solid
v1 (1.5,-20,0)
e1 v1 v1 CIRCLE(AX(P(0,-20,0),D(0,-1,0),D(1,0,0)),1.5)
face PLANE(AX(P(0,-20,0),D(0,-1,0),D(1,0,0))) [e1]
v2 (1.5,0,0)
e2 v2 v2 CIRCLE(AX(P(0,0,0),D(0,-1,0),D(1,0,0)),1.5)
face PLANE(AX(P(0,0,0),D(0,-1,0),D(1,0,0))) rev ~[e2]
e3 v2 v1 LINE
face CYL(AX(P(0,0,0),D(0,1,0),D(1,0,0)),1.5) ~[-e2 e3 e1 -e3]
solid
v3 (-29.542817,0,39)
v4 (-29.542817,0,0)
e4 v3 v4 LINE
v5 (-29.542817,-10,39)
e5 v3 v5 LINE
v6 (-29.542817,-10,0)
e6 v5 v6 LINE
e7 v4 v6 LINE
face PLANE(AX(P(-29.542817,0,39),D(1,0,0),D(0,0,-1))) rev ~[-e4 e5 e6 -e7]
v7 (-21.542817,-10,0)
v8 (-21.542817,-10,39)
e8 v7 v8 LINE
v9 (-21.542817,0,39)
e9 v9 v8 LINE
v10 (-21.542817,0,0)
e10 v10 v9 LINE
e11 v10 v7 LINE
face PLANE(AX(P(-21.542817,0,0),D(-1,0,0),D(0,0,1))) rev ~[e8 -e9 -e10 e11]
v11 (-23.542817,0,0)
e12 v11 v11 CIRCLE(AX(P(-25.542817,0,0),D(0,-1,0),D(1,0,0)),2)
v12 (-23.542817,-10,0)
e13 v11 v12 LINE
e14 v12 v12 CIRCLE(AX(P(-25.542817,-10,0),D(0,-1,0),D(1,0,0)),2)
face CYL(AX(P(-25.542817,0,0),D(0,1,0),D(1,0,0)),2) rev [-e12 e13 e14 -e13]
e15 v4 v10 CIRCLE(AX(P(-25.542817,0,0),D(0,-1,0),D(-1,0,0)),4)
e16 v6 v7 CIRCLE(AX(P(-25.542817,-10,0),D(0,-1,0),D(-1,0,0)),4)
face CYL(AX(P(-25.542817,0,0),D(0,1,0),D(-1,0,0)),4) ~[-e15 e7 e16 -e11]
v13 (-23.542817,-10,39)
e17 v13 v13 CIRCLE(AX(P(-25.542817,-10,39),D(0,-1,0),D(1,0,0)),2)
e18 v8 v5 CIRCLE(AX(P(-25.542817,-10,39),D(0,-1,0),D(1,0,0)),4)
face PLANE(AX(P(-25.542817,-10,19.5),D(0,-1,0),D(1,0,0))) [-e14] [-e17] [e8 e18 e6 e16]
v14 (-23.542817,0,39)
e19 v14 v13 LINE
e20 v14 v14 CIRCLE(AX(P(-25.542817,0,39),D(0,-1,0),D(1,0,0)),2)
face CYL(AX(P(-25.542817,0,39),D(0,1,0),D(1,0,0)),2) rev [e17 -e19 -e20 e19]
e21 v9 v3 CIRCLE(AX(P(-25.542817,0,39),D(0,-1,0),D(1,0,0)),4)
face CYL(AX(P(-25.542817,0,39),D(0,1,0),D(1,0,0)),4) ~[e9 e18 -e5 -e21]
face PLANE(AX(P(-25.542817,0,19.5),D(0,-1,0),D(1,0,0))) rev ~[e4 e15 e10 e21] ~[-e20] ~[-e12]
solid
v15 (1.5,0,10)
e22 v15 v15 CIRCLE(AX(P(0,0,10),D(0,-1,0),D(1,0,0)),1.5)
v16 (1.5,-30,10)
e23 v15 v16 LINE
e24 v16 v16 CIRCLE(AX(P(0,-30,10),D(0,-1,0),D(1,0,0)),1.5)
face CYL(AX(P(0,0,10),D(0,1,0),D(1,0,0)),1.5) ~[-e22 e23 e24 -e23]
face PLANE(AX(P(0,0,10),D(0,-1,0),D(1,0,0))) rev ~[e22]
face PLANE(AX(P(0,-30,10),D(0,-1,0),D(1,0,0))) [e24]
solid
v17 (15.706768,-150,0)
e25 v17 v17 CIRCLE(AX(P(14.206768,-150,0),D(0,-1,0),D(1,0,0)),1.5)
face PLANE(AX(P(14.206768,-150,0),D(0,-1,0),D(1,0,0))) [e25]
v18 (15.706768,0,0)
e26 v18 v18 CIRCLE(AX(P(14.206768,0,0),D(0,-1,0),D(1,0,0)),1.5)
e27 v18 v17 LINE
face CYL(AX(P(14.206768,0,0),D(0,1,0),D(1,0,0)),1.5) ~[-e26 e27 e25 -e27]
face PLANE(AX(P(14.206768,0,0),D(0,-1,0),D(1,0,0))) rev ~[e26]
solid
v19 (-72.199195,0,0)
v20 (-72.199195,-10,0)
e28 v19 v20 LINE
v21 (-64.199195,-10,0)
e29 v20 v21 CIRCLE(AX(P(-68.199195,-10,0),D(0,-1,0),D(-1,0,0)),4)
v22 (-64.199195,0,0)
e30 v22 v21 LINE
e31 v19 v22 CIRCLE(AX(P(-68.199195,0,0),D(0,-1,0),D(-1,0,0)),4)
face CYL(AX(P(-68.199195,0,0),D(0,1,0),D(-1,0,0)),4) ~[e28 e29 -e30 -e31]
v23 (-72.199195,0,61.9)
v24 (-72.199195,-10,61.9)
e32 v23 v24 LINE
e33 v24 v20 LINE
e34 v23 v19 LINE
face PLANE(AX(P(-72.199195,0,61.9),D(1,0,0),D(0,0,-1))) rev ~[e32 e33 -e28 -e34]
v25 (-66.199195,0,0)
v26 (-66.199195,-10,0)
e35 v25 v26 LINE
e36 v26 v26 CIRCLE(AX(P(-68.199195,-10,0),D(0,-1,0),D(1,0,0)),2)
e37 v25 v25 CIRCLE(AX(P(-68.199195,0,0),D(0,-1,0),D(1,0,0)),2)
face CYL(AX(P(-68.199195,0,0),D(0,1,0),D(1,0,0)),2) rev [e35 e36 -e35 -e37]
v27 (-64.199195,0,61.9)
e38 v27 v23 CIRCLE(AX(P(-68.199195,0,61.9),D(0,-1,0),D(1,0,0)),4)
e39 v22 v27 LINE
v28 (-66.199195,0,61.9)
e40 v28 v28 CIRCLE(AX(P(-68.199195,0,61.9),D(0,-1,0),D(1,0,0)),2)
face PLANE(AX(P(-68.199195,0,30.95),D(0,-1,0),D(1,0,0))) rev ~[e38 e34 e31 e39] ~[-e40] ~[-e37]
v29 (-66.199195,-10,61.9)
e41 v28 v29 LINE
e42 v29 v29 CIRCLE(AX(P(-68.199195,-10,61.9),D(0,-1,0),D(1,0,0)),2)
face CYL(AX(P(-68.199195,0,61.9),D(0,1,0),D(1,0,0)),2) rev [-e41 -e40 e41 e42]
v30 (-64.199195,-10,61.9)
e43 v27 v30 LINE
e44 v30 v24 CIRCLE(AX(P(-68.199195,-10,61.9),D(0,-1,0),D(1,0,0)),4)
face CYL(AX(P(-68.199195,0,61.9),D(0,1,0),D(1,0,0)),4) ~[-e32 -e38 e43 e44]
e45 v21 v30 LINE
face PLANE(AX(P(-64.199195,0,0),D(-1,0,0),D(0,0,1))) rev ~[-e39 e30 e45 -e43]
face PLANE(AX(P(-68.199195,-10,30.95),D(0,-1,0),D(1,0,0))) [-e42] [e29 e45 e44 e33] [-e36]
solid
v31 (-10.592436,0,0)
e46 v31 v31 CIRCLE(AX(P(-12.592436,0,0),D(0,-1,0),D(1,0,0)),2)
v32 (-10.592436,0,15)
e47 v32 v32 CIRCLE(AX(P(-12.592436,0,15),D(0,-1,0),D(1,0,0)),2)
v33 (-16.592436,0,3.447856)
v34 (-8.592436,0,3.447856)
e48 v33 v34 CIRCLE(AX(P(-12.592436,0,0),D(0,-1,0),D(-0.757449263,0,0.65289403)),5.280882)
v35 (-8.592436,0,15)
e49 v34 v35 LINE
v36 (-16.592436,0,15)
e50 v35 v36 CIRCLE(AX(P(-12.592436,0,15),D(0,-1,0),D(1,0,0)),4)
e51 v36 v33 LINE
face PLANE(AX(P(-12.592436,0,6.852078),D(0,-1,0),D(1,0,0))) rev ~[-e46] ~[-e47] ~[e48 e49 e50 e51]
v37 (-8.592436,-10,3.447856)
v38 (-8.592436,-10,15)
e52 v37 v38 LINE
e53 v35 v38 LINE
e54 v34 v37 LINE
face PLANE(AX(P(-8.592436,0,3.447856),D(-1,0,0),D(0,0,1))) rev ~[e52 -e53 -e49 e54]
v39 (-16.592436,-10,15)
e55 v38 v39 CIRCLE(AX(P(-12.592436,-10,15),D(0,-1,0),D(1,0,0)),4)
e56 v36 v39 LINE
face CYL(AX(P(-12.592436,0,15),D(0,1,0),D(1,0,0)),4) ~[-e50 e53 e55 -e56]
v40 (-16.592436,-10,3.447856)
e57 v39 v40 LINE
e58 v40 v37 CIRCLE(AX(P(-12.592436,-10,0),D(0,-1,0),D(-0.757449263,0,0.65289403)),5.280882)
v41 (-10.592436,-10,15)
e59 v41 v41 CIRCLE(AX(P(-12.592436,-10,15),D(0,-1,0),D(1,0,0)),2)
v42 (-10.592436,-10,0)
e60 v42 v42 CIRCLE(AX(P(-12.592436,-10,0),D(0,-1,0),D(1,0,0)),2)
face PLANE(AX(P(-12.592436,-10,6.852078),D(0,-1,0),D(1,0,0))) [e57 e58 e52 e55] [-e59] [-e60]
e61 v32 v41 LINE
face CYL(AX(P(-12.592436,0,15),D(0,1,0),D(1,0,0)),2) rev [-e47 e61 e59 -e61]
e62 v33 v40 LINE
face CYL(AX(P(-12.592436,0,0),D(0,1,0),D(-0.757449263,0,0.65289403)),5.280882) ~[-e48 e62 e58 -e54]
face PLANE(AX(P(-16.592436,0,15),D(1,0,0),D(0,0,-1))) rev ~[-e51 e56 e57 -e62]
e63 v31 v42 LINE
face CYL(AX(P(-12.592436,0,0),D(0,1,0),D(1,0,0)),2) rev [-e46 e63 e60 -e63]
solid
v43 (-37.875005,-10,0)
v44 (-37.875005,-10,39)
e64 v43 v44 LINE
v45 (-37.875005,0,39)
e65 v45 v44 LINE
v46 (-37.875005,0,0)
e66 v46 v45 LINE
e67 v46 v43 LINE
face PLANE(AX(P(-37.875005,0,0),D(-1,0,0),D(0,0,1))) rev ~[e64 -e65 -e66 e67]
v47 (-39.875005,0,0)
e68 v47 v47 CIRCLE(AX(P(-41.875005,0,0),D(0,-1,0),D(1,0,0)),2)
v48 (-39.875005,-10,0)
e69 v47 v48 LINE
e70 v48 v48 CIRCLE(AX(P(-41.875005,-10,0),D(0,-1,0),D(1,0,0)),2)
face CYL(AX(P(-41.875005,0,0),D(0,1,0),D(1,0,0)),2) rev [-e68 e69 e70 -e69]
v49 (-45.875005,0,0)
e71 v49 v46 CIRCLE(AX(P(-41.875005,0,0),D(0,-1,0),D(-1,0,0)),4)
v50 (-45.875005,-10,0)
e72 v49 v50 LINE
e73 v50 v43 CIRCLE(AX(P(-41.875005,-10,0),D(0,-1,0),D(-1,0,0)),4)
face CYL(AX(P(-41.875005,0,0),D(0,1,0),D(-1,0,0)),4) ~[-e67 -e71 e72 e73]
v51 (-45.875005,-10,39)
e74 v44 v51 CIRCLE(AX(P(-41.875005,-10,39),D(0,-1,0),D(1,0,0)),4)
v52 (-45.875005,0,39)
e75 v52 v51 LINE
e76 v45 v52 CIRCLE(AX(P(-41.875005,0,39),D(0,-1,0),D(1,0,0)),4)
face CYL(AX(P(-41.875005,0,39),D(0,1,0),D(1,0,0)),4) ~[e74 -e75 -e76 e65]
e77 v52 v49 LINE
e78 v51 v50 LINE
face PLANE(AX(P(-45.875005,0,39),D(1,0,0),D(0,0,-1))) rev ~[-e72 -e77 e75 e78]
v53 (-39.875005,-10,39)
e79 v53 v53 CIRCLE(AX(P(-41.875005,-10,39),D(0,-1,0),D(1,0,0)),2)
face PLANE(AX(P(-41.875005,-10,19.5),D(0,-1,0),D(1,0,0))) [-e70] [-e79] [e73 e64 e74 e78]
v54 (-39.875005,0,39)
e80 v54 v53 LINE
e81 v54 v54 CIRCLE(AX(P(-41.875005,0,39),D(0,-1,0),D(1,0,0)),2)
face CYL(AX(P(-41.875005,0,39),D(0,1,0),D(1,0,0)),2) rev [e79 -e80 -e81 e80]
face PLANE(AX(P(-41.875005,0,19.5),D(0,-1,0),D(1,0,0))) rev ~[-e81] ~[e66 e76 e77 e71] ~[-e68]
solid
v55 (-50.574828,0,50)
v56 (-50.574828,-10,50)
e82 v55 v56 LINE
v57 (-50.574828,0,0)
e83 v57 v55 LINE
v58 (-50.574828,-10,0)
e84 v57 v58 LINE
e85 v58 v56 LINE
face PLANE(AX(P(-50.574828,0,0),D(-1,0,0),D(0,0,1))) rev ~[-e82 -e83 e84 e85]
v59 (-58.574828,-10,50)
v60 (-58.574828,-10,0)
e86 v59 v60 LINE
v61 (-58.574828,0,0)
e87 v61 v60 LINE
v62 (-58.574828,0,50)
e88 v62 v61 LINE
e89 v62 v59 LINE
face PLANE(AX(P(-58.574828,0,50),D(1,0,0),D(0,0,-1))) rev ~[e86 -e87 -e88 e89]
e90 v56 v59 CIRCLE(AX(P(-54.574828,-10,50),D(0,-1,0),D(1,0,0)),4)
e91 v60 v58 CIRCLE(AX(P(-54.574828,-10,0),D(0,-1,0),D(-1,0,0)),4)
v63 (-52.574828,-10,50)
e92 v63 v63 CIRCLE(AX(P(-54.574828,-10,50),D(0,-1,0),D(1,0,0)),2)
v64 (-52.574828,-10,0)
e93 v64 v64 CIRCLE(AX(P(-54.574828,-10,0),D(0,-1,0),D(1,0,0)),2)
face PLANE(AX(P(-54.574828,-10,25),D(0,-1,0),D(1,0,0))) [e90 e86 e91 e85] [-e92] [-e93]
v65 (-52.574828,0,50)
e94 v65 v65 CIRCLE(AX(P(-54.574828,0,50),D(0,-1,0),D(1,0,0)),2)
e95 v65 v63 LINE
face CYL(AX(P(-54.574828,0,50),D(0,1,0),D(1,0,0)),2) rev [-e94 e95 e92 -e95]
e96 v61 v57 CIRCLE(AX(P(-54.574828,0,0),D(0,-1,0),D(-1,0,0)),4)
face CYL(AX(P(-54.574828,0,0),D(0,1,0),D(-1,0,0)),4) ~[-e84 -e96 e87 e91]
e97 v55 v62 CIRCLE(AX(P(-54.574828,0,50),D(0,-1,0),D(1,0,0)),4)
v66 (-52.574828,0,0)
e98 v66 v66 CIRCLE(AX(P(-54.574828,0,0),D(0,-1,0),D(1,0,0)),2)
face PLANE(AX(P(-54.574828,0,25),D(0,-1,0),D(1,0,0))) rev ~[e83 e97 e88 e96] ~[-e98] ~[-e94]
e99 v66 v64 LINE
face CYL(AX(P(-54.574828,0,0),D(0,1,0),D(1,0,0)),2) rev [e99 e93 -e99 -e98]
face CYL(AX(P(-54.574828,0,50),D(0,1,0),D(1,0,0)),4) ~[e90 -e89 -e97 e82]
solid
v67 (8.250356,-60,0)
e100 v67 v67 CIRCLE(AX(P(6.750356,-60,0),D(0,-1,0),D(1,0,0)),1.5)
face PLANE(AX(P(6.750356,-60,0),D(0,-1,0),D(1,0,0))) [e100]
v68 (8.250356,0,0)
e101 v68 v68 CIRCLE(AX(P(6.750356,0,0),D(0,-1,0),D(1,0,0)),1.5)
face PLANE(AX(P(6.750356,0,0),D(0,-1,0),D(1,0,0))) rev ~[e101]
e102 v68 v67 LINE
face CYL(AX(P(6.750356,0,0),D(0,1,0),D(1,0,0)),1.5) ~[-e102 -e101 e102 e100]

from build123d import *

# Parameters (mm, degrees)
F1_R      = 2
F2_DEPTH  = 10
F3_R      = 2
F4_DEPTH  = 10
F5_R      = 2
F6_DEPTH  = 10
F7_R      = 2
F8_DEPTH  = 10
F9_R      = 2
F10_DEPTH = 10
F11_R     = 1.5
F12_DEPTH = 20
F13_R     = 1.5
F14_DEPTH = 60
F15_DEPTH = 150
F16_R     = 1.5
F17_DEPTH = 30


# Not quite as in the source:
# - a feature names something its author has since deleted; it is built from what else it names


with BuildPart() as f2:
    # F1 (on Front) → F2 (new body)
    with BuildSketch(Plane.XZ):
        with BuildLine():
            Line((-8.5924360901, 3.4478561794), (-8.5924360901, 15))
            ThreePointArc((-8.5924360901, 15), (-12.5924360901, 19), (-16.5924360901, 15))
            Line((-16.5924360901, 15), (-16.5924360901, 3.4478561794))
            ThreePointArc((-16.5924360901, 3.4478561794), (-12.5924360901, -5.2808817667), (-8.5924360901, 3.4478561794))
        make_face()
        with Locations((-12.5924360901, 0)):
            Circle(F1_R, mode=Mode.SUBTRACT)
        with Locations((-12.5924360901, 15)):
            Circle(F1_R, mode=Mode.SUBTRACT)
    extrude(amount=F2_DEPTH)


with BuildPart() as f4:
    # F3 (on Front) → F4 (new body)
    with BuildSketch(Plane.XZ):
        with BuildLine():
            Line((-29.5428169801, 39), (-29.5428169801, 0))
            ThreePointArc((-29.5428169801, 0), (-25.5428169801, -4), (-21.5428169801, 0))
            Line((-21.5428169801, 0), (-21.5428169801, 39))
            ThreePointArc((-21.5428169801, 39), (-25.5428169801, 43), (-29.5428169801, 39))
        make_face()
        with Locations((-25.5428169801, 0)):
            Circle(F3_R, mode=Mode.SUBTRACT)
        with Locations((-25.5428169801, 39)):
            Circle(F3_R, mode=Mode.SUBTRACT)
    extrude(amount=F4_DEPTH)


with BuildPart() as f6:
    # F5 (on Front) → F6 (new body)
    with BuildSketch(Plane.XZ):
        with BuildLine():
            Line((-45.8750046201, 39), (-45.8750046201, 0))
            ThreePointArc((-45.8750046201, 0), (-41.8750046201, -4), (-37.8750046201, 0))
            Line((-37.8750046201, 0), (-37.8750046201, 39))
            ThreePointArc((-37.8750046201, 39), (-41.8750046201, 43), (-45.8750046201, 39))
        make_face()
        with Locations((-41.8750046201, 0)):
            Circle(F5_R, mode=Mode.SUBTRACT)
        with Locations((-41.8750046201, 39)):
            Circle(F5_R, mode=Mode.SUBTRACT)
    extrude(amount=F6_DEPTH)


with BuildPart() as f8:
    # F7 (on Front) → F8 (new body)
    with BuildSketch(Plane.XZ):
        with BuildLine():
            Line((-58.5748284761, 50), (-58.5748284761, 0))
            ThreePointArc((-58.5748284761, 0), (-54.5748284761, -4), (-50.5748284761, 0))
            Line((-50.5748284761, 0), (-50.5748284761, 50))
            ThreePointArc((-50.5748284761, 50), (-54.5748284761, 54), (-58.5748284761, 50))
        make_face()
        with Locations((-54.5748284761, 0)):
            Circle(F7_R, mode=Mode.SUBTRACT)
        with Locations((-54.5748284761, 50)):
            Circle(F7_R, mode=Mode.SUBTRACT)
    extrude(amount=F8_DEPTH)


with BuildPart() as f10:
    # F9 (on Front) → F10 (new body)
    with BuildSketch(Plane.XZ):
        with BuildLine():
            Line((-72.1991949677, 61.9), (-72.1991949677, 0))
            ThreePointArc((-72.1991949677, 0), (-68.1991949677, -4), (-64.1991949677, 0))
            Line((-64.1991949677, 0), (-64.1991949677, 61.9))
            ThreePointArc((-64.1991949677, 61.9), (-68.1991949677, 65.9), (-72.1991949677, 61.9))
        make_face()
        with Locations((-68.1991949677, 0)):
            Circle(F9_R, mode=Mode.SUBTRACT)
        with Locations((-68.1991949677, 61.9)):
            Circle(F9_R, mode=Mode.SUBTRACT)
    extrude(amount=F10_DEPTH)


with BuildPart() as f12:
    # F11 (on Front) → F12 (new body)
    with BuildSketch(Plane.XZ):
        Circle(F11_R)
    extrude(amount=F12_DEPTH)


with BuildPart() as f14:
    # F13 (on Front) → F14 (new body)
    with BuildSketch(Plane.XZ):
        with Locations((6.7503562369, 0)):
            Circle(F13_R)
    extrude(amount=F14_DEPTH)


with BuildPart() as f15:
    # F13 (on Front) → F15 (new body)
    with BuildSketch(Plane.XZ):
        with Locations((14.2067680135, 0)):
            Circle(F13_R)
    extrude(amount=F15_DEPTH)


with BuildPart() as f17:
    # F16 (on Front) → F17 (new body)
    with BuildSketch(Plane.XZ):
        with Locations((0, 10)):
            Circle(F16_R)
    extrude(amount=F17_DEPTH)


solid = Compound([f2.part, f4.part, f6.part, f8.part, f10.part, f12.part, f14.part, f15.part, f17.part])
